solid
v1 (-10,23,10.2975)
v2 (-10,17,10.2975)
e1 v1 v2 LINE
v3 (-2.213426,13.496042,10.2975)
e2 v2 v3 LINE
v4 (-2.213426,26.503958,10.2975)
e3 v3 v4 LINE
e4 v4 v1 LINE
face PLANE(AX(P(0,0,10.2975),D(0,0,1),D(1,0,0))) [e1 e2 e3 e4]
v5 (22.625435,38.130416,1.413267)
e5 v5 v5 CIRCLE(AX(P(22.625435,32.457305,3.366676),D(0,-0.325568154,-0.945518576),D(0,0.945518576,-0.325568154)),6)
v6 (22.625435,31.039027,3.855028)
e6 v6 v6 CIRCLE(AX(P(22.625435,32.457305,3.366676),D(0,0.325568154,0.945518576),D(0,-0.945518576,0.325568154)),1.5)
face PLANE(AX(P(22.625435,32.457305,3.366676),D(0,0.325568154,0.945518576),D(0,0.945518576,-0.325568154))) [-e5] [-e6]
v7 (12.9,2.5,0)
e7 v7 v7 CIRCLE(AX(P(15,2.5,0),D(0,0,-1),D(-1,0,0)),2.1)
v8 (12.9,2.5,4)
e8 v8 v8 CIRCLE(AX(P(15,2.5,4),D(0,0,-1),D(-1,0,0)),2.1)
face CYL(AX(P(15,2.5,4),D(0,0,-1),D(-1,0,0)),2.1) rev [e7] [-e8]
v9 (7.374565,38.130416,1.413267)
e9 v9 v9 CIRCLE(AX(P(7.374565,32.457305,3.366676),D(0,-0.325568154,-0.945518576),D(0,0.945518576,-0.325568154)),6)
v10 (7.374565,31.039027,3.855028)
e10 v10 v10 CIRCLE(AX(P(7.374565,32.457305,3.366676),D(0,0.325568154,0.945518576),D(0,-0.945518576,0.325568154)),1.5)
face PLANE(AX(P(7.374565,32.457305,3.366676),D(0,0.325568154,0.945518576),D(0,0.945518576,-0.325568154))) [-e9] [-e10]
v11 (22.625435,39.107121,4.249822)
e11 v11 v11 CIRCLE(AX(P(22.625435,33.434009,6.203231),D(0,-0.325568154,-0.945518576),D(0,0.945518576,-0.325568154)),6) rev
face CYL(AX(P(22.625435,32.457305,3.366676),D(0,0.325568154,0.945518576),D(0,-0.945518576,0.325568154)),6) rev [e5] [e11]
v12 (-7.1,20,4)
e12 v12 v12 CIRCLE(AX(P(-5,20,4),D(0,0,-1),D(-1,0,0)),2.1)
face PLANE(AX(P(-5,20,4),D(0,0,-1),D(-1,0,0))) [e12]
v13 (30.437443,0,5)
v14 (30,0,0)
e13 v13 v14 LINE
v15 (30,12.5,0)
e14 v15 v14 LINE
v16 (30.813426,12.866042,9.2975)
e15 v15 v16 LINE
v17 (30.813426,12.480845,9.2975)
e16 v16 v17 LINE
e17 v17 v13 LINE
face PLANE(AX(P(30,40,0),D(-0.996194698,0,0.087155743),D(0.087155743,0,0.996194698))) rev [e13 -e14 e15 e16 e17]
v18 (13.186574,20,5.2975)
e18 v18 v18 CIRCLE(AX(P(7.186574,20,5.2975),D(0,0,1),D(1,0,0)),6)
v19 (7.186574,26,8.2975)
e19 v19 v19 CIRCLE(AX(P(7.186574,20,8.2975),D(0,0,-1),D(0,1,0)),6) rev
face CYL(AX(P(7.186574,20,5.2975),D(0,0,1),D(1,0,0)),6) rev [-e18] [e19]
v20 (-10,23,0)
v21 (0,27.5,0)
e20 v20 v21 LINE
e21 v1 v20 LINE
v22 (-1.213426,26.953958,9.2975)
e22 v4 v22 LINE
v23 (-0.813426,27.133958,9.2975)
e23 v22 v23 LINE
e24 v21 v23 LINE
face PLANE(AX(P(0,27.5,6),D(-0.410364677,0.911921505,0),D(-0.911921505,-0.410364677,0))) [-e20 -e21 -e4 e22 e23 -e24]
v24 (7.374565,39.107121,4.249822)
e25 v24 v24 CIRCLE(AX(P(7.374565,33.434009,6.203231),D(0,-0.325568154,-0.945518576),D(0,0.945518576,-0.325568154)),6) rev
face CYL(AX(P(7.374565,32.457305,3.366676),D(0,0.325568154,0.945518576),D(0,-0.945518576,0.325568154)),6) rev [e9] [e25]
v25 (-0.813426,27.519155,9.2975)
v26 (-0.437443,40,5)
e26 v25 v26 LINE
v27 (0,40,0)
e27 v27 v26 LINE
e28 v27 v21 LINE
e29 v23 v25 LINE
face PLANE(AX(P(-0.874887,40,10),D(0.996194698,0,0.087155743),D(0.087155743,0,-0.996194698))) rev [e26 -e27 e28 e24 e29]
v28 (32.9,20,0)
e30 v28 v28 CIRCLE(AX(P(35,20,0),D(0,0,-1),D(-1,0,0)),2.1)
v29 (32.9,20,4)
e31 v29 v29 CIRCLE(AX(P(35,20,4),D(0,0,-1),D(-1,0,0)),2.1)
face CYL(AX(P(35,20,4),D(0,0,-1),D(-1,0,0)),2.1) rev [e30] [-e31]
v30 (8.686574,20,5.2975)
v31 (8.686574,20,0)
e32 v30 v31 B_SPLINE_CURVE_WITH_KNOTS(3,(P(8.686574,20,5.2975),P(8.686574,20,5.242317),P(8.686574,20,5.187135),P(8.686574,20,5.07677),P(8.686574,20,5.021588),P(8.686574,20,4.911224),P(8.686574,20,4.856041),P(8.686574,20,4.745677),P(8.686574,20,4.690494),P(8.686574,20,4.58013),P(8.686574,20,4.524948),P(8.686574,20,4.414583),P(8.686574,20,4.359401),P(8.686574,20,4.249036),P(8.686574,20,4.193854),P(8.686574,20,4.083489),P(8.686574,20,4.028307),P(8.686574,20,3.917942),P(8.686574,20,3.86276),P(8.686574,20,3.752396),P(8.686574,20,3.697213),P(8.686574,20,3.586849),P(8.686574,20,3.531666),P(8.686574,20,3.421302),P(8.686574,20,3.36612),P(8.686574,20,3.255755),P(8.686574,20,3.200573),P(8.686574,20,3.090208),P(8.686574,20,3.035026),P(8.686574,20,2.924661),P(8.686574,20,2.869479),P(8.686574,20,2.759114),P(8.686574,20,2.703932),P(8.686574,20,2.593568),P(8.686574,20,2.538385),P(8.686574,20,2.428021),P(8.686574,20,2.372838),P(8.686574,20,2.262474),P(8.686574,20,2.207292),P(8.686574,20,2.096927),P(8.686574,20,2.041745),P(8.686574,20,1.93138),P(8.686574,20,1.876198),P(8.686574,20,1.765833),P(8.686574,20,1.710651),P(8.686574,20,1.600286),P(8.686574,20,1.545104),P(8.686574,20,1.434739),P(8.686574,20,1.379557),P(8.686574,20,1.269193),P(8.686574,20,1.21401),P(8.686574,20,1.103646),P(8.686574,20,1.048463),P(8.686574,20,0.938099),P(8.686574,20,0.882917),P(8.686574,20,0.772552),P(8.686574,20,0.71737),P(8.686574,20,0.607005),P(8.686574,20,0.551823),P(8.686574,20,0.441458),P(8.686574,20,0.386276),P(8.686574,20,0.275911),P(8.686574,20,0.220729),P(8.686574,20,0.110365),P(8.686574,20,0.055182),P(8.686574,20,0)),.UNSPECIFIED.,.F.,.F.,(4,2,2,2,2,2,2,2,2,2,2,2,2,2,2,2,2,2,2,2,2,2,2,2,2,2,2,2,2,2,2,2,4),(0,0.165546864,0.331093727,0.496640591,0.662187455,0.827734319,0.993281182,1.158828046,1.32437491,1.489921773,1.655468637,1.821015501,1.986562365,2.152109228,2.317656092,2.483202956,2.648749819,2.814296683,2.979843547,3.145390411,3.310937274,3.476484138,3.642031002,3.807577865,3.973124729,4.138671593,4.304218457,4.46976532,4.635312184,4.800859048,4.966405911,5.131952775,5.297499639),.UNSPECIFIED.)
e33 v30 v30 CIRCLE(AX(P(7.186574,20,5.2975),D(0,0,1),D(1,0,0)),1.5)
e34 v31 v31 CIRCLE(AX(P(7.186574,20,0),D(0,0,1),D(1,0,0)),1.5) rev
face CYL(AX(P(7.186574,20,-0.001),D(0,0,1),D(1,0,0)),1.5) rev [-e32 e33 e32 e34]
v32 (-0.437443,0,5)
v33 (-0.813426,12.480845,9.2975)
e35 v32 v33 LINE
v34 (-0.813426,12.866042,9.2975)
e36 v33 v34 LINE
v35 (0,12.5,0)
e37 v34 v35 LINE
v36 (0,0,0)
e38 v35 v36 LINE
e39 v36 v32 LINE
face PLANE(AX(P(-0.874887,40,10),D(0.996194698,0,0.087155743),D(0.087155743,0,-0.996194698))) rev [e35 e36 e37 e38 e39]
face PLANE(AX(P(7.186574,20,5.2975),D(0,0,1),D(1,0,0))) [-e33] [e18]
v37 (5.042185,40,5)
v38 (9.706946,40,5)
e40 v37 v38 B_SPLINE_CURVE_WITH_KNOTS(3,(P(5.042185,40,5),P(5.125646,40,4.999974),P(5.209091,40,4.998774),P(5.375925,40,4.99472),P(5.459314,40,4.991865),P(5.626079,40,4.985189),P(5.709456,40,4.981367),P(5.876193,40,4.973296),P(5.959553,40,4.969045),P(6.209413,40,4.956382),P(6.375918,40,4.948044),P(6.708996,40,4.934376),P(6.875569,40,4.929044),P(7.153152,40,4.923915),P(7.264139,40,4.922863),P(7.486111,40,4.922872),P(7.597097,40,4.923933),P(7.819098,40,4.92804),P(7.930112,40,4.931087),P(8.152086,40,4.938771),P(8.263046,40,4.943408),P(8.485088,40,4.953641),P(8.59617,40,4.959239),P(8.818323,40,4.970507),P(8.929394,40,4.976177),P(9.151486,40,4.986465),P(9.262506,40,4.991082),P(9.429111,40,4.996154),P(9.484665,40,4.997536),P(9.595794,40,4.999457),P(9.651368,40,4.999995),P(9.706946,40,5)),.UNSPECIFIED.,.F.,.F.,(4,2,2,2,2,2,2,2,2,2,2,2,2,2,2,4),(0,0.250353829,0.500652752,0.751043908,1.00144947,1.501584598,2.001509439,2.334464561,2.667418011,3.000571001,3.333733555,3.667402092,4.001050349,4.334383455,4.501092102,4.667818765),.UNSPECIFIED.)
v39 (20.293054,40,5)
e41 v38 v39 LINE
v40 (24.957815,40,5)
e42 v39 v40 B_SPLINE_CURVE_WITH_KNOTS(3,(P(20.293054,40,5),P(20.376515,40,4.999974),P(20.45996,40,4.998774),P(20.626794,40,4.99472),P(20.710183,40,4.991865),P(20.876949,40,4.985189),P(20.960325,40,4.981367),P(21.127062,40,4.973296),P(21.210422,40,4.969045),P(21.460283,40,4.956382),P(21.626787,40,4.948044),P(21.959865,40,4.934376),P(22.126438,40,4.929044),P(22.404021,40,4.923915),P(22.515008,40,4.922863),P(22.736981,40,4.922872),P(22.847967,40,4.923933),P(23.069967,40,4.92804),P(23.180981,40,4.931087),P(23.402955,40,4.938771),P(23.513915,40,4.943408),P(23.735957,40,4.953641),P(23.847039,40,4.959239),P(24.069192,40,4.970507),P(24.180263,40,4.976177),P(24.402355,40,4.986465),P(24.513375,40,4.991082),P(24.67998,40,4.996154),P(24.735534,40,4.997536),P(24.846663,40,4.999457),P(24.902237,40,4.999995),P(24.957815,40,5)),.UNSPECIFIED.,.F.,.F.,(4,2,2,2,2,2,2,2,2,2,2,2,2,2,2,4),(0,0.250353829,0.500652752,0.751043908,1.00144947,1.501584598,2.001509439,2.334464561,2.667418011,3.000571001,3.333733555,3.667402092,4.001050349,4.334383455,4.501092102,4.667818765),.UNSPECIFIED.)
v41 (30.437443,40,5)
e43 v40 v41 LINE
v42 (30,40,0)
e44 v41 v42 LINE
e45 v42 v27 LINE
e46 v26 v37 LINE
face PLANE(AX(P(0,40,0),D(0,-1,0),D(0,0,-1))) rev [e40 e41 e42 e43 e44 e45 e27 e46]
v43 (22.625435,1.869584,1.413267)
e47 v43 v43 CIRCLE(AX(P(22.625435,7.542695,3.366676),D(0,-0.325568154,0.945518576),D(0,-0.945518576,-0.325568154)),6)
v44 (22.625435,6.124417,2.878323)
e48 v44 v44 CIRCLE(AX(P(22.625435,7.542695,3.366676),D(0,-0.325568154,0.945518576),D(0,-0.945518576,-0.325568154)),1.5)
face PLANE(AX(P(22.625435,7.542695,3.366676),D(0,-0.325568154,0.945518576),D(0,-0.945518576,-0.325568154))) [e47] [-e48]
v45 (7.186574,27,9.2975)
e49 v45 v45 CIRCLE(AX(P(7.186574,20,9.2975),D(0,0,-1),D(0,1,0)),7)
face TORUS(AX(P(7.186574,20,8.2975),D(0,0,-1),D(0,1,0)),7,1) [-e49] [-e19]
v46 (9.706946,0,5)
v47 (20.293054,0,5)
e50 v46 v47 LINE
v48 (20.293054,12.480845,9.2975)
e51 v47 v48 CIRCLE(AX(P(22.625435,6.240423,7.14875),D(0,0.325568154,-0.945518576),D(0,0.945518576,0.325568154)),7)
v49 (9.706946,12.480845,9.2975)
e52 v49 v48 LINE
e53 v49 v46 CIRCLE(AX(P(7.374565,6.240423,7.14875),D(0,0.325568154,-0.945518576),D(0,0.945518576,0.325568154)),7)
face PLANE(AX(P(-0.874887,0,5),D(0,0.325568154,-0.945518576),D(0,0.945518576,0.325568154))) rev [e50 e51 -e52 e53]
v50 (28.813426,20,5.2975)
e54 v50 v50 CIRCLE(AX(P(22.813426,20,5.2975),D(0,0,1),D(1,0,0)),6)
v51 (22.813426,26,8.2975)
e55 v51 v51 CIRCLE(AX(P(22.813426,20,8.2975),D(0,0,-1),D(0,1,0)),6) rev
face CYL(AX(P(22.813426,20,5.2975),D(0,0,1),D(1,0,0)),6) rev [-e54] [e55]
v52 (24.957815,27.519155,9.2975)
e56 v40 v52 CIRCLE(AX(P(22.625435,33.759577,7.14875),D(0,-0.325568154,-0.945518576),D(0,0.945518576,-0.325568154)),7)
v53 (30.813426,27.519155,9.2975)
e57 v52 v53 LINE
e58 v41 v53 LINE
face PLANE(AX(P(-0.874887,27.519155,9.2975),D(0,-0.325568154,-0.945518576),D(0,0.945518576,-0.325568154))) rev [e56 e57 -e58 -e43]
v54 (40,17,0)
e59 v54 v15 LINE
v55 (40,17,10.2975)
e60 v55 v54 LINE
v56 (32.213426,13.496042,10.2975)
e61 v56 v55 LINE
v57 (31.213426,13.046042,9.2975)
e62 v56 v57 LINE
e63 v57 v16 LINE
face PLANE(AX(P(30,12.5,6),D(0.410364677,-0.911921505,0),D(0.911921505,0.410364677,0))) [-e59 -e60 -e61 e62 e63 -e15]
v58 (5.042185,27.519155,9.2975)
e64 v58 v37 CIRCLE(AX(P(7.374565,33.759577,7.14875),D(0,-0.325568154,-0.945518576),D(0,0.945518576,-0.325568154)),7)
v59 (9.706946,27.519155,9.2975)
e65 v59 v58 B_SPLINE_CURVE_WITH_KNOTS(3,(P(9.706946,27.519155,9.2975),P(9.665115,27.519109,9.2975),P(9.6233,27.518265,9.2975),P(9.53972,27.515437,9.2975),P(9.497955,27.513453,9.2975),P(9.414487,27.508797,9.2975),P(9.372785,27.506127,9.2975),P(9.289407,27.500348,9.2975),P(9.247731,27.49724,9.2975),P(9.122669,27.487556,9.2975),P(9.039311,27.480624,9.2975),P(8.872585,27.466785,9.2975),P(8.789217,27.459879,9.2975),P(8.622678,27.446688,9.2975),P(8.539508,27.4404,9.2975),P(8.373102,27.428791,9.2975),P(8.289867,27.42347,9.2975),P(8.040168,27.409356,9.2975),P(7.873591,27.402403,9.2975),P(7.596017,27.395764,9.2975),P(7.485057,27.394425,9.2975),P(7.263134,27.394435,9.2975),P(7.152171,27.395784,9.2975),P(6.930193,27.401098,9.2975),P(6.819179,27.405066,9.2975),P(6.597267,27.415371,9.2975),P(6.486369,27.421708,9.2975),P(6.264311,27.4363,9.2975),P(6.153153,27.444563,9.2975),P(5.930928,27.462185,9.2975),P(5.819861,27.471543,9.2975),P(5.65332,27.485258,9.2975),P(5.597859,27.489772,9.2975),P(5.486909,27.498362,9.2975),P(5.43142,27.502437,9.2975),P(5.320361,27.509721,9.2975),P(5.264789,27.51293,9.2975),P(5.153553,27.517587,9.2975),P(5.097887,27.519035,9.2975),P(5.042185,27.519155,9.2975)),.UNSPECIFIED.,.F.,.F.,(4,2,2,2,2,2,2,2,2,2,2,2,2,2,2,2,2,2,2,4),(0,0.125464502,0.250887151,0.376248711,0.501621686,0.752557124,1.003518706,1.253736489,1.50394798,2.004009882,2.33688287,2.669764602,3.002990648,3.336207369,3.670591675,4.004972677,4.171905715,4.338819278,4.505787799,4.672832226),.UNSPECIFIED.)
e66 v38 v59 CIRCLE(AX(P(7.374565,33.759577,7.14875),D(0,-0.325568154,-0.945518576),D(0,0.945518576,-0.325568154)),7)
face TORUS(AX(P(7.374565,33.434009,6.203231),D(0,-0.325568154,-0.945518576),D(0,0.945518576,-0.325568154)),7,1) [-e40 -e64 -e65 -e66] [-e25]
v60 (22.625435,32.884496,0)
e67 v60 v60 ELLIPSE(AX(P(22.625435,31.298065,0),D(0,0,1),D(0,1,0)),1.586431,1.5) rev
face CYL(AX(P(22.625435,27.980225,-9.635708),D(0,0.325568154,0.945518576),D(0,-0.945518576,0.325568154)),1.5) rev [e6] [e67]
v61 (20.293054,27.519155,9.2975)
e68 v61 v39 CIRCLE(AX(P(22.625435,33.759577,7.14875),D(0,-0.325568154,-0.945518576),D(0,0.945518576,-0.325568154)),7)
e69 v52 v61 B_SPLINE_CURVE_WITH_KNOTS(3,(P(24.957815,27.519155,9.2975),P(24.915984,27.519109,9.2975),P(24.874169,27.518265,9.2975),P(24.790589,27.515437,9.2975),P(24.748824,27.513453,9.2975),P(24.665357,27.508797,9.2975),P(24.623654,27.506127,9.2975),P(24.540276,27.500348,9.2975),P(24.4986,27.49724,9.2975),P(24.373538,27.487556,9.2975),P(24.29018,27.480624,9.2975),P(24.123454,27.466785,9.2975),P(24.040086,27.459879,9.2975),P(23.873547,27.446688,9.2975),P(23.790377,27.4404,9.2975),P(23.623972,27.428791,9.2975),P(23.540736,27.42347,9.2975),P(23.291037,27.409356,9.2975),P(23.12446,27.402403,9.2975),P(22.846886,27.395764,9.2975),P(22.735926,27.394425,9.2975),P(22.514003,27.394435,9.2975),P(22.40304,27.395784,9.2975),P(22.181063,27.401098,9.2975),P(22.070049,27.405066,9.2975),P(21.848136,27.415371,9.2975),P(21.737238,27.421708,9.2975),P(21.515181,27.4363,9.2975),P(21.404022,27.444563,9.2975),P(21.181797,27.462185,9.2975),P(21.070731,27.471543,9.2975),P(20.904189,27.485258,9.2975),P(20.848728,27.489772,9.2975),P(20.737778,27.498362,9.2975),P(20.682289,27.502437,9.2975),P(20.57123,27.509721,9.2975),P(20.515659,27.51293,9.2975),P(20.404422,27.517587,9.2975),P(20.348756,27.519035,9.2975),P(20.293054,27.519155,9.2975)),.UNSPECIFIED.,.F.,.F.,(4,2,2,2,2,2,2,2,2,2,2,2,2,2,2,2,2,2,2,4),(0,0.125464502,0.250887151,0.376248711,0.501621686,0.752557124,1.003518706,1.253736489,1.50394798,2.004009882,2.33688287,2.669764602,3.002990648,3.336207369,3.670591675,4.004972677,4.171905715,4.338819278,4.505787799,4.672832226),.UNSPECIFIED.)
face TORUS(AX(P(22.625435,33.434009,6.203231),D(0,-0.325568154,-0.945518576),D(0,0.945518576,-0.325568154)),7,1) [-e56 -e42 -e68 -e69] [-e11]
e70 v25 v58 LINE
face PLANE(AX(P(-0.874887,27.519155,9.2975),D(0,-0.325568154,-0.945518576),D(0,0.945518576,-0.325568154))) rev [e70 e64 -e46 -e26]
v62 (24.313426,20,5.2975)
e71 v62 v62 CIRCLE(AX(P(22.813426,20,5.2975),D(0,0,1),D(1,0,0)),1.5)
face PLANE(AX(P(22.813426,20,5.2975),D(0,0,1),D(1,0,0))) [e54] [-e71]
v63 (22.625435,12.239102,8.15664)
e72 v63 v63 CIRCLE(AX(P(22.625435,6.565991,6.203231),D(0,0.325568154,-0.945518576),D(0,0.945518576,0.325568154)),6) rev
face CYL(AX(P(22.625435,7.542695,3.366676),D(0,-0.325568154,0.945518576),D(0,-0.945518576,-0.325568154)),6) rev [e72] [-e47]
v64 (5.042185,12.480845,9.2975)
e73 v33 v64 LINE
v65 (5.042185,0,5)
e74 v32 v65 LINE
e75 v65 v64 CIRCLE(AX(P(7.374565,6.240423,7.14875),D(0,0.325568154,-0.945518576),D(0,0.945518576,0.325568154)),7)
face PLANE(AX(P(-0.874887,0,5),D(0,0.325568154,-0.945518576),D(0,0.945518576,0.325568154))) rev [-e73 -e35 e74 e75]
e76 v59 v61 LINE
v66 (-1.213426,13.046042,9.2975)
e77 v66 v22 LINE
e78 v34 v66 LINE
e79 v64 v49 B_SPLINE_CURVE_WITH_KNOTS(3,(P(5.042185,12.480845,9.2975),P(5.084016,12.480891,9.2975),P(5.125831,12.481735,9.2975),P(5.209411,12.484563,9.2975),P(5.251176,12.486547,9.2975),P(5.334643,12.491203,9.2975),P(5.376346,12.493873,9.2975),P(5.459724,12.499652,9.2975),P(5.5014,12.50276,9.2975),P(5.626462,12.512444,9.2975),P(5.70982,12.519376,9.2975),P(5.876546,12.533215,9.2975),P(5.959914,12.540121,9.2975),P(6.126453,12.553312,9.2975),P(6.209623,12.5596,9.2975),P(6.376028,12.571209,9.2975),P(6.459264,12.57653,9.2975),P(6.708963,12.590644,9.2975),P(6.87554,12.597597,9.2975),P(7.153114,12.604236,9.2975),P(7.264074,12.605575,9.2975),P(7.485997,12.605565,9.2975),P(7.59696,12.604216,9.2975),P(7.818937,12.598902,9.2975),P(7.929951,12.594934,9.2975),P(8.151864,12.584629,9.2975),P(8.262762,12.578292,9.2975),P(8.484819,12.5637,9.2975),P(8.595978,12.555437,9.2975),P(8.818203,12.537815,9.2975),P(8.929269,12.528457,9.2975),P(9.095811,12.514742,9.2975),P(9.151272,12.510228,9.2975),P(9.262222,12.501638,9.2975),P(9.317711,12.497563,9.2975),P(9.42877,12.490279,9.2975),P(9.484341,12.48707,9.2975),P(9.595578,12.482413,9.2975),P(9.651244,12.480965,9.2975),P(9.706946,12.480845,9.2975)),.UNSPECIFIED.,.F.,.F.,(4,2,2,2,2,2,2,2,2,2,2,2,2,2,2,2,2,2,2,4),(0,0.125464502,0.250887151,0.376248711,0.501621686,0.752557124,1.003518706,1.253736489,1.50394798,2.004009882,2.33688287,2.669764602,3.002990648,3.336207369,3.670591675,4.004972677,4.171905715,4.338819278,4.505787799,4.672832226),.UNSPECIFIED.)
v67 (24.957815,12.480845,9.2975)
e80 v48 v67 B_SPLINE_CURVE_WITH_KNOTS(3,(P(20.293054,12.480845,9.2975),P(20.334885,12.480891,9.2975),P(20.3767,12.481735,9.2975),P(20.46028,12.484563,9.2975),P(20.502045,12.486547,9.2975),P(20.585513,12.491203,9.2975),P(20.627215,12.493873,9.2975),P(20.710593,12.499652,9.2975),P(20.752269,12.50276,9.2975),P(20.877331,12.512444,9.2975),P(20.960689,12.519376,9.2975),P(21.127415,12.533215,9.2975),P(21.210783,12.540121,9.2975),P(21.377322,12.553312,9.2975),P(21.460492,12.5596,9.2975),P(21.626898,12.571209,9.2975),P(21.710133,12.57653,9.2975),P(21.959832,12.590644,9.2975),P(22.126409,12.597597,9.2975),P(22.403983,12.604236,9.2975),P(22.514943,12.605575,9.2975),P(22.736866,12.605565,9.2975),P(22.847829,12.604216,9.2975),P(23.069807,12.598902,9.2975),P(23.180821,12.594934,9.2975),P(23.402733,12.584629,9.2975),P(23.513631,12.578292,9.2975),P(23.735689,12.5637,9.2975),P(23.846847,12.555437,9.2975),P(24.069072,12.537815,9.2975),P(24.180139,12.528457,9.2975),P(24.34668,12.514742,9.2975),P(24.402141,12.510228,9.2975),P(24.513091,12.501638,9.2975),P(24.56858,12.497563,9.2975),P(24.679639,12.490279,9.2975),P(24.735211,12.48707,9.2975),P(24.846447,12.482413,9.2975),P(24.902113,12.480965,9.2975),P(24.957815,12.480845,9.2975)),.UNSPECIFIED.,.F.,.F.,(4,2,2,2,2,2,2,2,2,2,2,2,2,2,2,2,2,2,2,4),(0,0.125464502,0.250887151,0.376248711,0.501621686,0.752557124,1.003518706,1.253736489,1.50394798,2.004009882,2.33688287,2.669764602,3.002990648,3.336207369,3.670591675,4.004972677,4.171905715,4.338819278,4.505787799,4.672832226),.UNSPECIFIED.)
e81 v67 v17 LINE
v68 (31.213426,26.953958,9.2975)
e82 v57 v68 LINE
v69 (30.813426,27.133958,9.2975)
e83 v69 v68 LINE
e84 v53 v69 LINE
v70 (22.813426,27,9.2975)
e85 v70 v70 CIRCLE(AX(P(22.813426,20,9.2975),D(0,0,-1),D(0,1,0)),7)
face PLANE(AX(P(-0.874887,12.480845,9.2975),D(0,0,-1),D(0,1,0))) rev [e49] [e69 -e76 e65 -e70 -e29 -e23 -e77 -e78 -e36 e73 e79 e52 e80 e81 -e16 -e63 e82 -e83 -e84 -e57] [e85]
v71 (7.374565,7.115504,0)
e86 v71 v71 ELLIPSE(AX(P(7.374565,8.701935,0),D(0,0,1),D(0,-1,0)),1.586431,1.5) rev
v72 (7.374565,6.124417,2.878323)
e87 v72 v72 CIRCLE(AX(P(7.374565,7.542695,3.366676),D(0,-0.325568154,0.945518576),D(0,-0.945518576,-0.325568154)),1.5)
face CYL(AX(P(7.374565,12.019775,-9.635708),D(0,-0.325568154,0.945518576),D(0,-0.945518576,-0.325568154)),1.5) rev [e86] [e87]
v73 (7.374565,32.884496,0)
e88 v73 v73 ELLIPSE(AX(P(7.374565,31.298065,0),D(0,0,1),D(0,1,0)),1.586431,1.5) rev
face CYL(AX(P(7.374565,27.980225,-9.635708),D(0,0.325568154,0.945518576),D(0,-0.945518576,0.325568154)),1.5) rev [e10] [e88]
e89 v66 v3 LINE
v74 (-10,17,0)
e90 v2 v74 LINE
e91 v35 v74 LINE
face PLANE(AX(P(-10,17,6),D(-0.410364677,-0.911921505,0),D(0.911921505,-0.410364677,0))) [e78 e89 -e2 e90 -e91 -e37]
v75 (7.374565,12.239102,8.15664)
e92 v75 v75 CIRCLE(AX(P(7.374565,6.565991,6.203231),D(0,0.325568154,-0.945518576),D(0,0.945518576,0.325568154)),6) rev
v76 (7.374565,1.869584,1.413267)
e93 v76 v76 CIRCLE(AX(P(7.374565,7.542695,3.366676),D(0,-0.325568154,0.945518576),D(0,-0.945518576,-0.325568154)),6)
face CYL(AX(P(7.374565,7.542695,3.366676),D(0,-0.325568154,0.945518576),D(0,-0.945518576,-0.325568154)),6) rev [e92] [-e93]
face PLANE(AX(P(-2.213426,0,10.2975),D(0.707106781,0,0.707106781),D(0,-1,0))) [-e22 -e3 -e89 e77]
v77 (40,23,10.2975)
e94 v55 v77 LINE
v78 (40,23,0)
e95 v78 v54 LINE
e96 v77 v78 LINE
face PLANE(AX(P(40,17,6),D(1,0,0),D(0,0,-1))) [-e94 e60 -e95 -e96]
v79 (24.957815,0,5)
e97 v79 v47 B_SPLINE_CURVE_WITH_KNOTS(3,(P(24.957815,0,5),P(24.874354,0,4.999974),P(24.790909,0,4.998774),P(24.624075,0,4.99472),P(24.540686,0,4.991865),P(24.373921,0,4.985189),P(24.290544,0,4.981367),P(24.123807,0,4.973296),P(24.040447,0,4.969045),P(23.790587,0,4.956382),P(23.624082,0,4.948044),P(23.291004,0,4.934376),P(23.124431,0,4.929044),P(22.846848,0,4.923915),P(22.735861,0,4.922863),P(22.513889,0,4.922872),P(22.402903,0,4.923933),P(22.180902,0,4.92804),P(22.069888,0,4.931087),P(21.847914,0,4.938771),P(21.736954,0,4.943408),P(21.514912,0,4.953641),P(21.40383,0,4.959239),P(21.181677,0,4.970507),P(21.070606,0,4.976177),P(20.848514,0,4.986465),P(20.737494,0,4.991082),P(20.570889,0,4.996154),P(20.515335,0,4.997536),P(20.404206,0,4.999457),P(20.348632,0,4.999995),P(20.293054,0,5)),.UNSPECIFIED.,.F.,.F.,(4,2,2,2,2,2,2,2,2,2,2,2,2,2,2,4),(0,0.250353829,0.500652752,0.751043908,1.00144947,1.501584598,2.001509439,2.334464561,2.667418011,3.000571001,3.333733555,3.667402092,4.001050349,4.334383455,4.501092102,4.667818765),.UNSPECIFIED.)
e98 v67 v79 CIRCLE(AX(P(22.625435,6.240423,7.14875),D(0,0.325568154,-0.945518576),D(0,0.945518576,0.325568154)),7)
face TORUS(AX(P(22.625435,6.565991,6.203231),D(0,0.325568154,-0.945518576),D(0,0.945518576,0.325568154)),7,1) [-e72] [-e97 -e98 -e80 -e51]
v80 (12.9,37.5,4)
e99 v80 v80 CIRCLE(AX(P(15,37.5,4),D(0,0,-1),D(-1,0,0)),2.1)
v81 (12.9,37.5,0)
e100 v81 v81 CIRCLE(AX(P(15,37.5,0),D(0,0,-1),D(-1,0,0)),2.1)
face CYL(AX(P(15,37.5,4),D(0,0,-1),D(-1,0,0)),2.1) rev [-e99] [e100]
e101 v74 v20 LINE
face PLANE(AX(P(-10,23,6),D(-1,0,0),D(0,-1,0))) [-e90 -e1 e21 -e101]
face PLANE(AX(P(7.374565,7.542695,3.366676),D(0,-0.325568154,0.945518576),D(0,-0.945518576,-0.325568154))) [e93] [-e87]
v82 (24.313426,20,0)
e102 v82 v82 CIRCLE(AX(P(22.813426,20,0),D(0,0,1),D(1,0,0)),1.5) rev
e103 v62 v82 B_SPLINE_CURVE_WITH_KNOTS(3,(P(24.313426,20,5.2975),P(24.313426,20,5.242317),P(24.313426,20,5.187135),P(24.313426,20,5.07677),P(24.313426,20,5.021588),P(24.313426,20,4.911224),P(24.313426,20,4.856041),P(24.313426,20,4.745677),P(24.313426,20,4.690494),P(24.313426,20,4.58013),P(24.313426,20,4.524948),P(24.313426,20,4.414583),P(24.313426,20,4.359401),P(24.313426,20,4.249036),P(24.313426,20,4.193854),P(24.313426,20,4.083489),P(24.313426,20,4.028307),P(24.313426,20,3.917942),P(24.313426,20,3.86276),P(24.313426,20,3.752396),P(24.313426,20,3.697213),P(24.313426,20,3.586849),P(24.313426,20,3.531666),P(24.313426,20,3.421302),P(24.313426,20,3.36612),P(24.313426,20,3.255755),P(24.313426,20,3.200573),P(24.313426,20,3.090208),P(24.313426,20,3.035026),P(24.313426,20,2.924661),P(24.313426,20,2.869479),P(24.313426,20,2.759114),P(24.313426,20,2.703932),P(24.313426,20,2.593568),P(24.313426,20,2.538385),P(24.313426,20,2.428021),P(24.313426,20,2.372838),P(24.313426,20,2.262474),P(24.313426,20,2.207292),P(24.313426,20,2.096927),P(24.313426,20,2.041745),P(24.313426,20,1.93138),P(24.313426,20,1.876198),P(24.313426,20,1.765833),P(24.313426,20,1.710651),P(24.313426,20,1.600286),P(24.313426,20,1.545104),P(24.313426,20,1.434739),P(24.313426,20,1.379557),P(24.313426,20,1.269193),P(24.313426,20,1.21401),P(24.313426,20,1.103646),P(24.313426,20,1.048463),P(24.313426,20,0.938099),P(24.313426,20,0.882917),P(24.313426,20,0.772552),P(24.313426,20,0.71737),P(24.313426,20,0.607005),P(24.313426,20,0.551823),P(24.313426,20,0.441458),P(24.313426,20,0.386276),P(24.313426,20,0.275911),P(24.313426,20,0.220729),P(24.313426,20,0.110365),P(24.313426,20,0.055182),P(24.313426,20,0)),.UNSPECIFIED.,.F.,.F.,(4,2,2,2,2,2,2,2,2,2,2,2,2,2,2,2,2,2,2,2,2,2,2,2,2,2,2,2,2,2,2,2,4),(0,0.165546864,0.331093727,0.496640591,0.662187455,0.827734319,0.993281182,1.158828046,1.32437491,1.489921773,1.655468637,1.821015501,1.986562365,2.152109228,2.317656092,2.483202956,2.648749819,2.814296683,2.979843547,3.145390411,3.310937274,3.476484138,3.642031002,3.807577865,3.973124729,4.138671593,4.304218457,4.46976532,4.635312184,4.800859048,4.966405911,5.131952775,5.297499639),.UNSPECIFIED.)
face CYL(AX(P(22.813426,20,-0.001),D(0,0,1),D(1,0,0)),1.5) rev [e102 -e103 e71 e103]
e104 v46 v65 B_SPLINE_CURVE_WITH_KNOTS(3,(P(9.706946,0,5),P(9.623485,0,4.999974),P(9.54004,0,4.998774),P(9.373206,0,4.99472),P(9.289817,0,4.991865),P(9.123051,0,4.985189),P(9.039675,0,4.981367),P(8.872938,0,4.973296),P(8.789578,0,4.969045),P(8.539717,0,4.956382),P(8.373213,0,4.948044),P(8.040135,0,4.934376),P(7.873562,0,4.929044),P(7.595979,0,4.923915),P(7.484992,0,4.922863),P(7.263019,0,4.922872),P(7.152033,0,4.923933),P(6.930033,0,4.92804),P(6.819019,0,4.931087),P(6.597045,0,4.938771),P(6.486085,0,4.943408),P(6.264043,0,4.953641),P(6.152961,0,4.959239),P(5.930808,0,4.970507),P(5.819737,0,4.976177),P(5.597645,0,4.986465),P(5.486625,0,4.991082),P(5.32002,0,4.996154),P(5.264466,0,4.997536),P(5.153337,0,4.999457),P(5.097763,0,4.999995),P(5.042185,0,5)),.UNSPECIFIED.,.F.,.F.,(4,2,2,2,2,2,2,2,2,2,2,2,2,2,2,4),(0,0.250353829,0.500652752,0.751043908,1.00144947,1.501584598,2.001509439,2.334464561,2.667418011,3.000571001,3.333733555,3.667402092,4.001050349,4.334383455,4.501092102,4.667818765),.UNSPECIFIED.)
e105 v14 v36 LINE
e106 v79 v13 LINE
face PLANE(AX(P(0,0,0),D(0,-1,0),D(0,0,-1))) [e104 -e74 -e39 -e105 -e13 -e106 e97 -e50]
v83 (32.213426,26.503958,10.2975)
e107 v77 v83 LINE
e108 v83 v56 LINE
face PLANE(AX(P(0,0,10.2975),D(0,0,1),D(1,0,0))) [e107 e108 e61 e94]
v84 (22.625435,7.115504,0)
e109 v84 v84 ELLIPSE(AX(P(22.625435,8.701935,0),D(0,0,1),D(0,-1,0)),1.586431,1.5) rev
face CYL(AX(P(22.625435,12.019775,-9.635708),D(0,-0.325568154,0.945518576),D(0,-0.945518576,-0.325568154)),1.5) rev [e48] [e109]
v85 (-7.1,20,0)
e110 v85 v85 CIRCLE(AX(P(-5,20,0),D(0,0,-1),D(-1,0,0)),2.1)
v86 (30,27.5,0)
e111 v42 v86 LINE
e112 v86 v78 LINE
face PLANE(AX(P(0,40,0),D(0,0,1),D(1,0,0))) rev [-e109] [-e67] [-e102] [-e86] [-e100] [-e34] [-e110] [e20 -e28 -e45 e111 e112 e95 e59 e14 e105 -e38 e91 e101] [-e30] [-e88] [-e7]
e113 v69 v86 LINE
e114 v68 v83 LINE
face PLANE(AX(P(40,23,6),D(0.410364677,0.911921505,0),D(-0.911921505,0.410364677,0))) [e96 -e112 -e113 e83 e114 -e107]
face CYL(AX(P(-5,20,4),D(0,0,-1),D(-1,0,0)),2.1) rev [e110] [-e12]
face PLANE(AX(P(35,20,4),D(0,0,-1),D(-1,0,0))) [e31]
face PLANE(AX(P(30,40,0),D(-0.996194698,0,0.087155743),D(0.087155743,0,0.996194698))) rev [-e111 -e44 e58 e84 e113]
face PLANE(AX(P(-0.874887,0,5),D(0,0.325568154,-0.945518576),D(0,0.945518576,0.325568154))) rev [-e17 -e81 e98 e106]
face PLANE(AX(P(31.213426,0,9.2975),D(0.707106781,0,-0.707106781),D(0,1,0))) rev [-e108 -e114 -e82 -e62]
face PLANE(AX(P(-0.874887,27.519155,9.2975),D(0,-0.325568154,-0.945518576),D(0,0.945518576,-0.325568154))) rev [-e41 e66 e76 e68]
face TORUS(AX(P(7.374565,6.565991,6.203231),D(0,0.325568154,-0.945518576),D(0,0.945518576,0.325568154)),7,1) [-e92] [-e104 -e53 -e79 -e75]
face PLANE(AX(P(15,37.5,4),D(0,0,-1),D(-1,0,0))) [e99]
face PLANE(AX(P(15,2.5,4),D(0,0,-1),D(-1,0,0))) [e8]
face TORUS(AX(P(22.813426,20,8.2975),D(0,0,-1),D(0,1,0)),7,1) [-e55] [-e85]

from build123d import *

# Parameters (mm, degrees)
BOSS_EXTRUDE1_DEPTH     = 40
CUT_EXTRUDE1_DEPTH      = 52.509791542
CUT_EXTRUDE1_DEPTH_BACK = 52.509791542
SKETCH5_R               = 6
CUT_EXTRUDE2_DEPTH      = 4
SKETCH7_R               = 6
CUT_EXTRUDE3_DEPTH      = 4
FILLET1_R               = 1
BOSS_EXTRUDE2_DEPTH     = 6
SKETCH10_R              = 2.1
CUT_EXTRUDE5_DEPTH      = 4
CUT_EXTRUDE6_REACH      = 58.816
SKETCH11_R              = 1.5
CUT_EXTRUDE7_REACH      = 59.386
SKETCH12_R              = 1.5
CUT_EXTRUDE8_REACH      = 57.054
SKETCH13_R              = 1.5
BOSS_EXTRUDE3_DEPTH     = 3.297499639
BOSS_EXTRUDE4_DEPTH     = 1
CHAMFER1_SIZE           = 1


# Some blends are built 0.0001 mm under size
with BuildPart() as part:
    # Sketch2 → Boss-Extrude1 (new body)
    with BuildSketch(Plane(origin=(0, 0, 0), x_dir=(1, 0, 0), z_dir=(0, 1, 0))):
        Polygon((0, 0), (30, 0), (30.874886635, -10), (-0.874886635, -10), align=None)
    extrude(amount=BOSS_EXTRUDE1_DEPTH)

    # Sketch3 → Cut-Extrude1 (cut, two sides: drawn at the far end of the back side and taken through both)
    with BuildSketch(Plane(origin=(0, 0, 0), x_dir=(0, 0, -1), z_dir=(1, 0, 0)).offset(-CUT_EXTRUDE1_DEPTH_BACK)):
        Polygon((-5, 0), (-9.297499639, 12.480845198), (-9.297499639, 27.519154802), (-5, 40), (-10, 40), (-10, 0), align=None)
    extrude(amount=CUT_EXTRUDE1_DEPTH + CUT_EXTRUDE1_DEPTH_BACK, mode=Mode.SUBTRACT)

    # Sketch5 → Cut-Extrude2 (cut)
    with BuildSketch(Plane(origin=(0, -1.539153688, 4.470026884), x_dir=(1, 0, 0), z_dir=(0, -0.32556815445715714, 0.9455185755993166))):
        with Locations(Location((7.374565432, 8.227840772, 0), (0, 0, 270))):
            Circle(SKETCH5_R)
        with Locations(Location((22.625434568, 8.227840772, 0), (0, 0, 270))):
            Circle(SKETCH5_R)
    cut_extrude2 = extrude(amount=-CUT_EXTRUDE2_DEPTH, mode=Mode.SUBTRACT)

    # Mirror3: Cut-Extrude2 across plane
    add(cut_extrude2.mirror(Plane.ZX.offset(20)), mode=Mode.SUBTRACT)

    # Sketch7 → Cut-Extrude3 (cut)
    with BuildSketch(Plane.XY.offset(9.297499639)):
        with Locations((7.186574182, 20)):
            Circle(SKETCH7_R)
        with Locations((22.813425818, 20)):
            Circle(SKETCH7_R)
    extrude(amount=-CUT_EXTRUDE3_DEPTH, mode=Mode.SUBTRACT)

    # Fillet1
    # the kernel refuses this fillet: 1 mm, written as the material it takes off along each edge
    with BuildSketch(Plane(origin=(7.374565432, 6.240422599, 7.148749819), x_dir=(0, -0.9455185755993166, -0.3255681544571572), z_dir=(-1, 0, 0))) as fillet1_piece_1:
        with BuildLine():
            CenterArc((6 + FILLET1_R, -FILLET1_R), FILLET1_R, 90, 90)
            Line((6, -FILLET1_R), (6, 0))
            Line((6, 0), (6 + FILLET1_R, 0))
        make_face()
    revolve(axis=Axis((7.374565432, 6.240422599, 7.148749819), (0, -0.32556815445715714, 0.9455185755993166)), mode=Mode.SUBTRACT)
    with BuildSketch(Plane(origin=(22.625434568, 6.240422599, 7.148749819), x_dir=(0, -0.9455185755993167, -0.3255681544571572), z_dir=(-1, 0, 0))) as fillet1_piece_2:
        with BuildLine():
            CenterArc((6 + FILLET1_R, -FILLET1_R), FILLET1_R, 90, 90)
            Line((6, -FILLET1_R), (6, 0))
            Line((6, 0), (6 + FILLET1_R, 0))
        make_face()
    revolve(axis=Axis((22.625434568, 6.240422599, 7.148749819), (0, -0.32556815445715714, 0.9455185755993166)), mode=Mode.SUBTRACT)
    with BuildSketch(Plane(origin=(7.374565432, 33.759577401, 7.148749819), x_dir=(0, 0.9455185755993166, -0.32556815445715714), z_dir=(-1, 0, 0))) as fillet1_piece_3:
        with BuildLine():
            CenterArc((6 + FILLET1_R, FILLET1_R), FILLET1_R, 180, 90)
            Line((6, FILLET1_R), (6, 0))
            Line((6, 0), (6 + FILLET1_R, 0))
        make_face()
    revolve(axis=Axis((7.374565432, 33.759577401, 7.148749819), (0, -0.3255681544571571, -0.9455185755993166)), mode=Mode.SUBTRACT)
    with BuildSketch(Plane(origin=(22.625434568, 33.759577401, 7.148749819), x_dir=(0, 0.9455185755993165, -0.3255681544571574), z_dir=(-1, 0, 0))) as fillet1_piece_4:
        with BuildLine():
            CenterArc((6 + FILLET1_R, FILLET1_R), FILLET1_R, 180, 90)
            Line((6, FILLET1_R), (6, 0))
            Line((6, 0), (6 + FILLET1_R, 0))
        make_face()
    revolve(axis=Axis((22.625434568, 33.759577401, 7.148749819), (0, -0.3255681544571571, -0.9455185755993166)), mode=Mode.SUBTRACT)
    with BuildSketch(Plane(origin=(7.186574182, 20, 9.297499639), x_dir=(1, 0, 0), z_dir=(0, -1, 0))) as fillet1_piece_5:
        with BuildLine():
            CenterArc((6 + FILLET1_R, -FILLET1_R), FILLET1_R, 90, 90)
            Line((6, -FILLET1_R), (6, 0))
            Line((6, 0), (6 + FILLET1_R, 0))
        make_face()
    revolve(axis=Axis((7.186574182, 20, 9.297499639), (0, 0, 1)), mode=Mode.SUBTRACT)
    with BuildSketch(Plane(origin=(22.813425818, 20, 9.297499639), x_dir=(1, 0, 0), z_dir=(0, -1, 0))) as fillet1_piece_6:
        with BuildLine():
            CenterArc((6 + FILLET1_R, -FILLET1_R), FILLET1_R, 90, 90)
            Line((6, -FILLET1_R), (6, 0))
            Line((6, 0), (6 + FILLET1_R, 0))
        make_face()
    revolve(axis=Axis((22.813425818, 20, 9.297499639), (0, 0, 1)), mode=Mode.SUBTRACT)

    # Sketch9 → Boss-Extrude2 (add)
    with BuildSketch(Plane(origin=(0, 0, 0), x_dir=(-1, 0, 0), z_dir=(0, 0, -1))):
        Polygon((-30, 12.5), (-40, 17), (-40, 23), (-30, 27.5), align=None)
        Polygon((0, 12.5), (0, 27.5), (10, 23), (10, 17), align=None)
    extrude(amount=-BOSS_EXTRUDE2_DEPTH)

    # Sketch10 → Cut-Extrude5 (cut)
    with BuildSketch(Plane(origin=(0, 0, 0), x_dir=(-1, 0, 0), z_dir=(0, 0, -1))):
        with Locations((-15, 37.5)):
            Circle(SKETCH10_R)
        with Locations((-15, 2.5)):
            Circle(SKETCH10_R)
        with Locations((-35, 20)):
            Circle(SKETCH10_R)
        with Locations((5, 20)):
            Circle(SKETCH10_R)
    extrude(amount=-CUT_EXTRUDE5_DEPTH, mode=Mode.SUBTRACT)

    # Sketch11 → Cut-Extrude6 (cut, up to next)
    with BuildSketch(Plane.XY.offset(5.297499639), mode=Mode.PRIVATE) as cut_extrude6_sk1:
        with Locations((7.186574182, 20)):
            Circle(SKETCH11_R)
    cut_extrude6_tool1 = extrude(cut_extrude6_sk1.sketch, amount=-CUT_EXTRUDE6_REACH, mode=Mode.PRIVATE) & part.part
    # Sketch11 → Cut-Extrude6 (cut, up to next)
    with BuildSketch(Plane.XY.offset(5.297499639), mode=Mode.PRIVATE) as cut_extrude6_sk2:
        with Locations((22.813425818, 20)):
            Circle(SKETCH11_R)
    cut_extrude6_tool2 = extrude(cut_extrude6_sk2.sketch, amount=-CUT_EXTRUDE6_REACH, mode=Mode.PRIVATE) & part.part
    add(cut_extrude6_tool1.solids().sort_by_distance((7.186574, 20, 5.2975))[0], mode=Mode.SUBTRACT)
    add(cut_extrude6_tool2.solids().sort_by_distance((22.813426, 20, 5.2975))[0], mode=Mode.SUBTRACT)

    # Cut-Extrude7: up to this plane
    cut_extrude7_end = Plane(origin=(0, 40, 0), z_dir=(0, 0, 1))
    # Sketch12 → Cut-Extrude7 (cut, up to the surface)
    with BuildSketch(Plane(origin=(0, -0.23688107, 0.687952582), x_dir=(1, 0, 0), z_dir=(0, -0.3255681544571572, 0.9455185755993167)), mode=Mode.PRIVATE) as cut_extrude7_sk1:
        with Locations(Location((7.374565432, 8.227840772, 0), (0, 0, 270))):
            Circle(SKETCH12_R)
    cut_extrude7_tool1 = split(extrude(cut_extrude7_sk1.sketch, amount=-CUT_EXTRUDE7_REACH, mode=Mode.PRIVATE), bisect_by=cut_extrude7_end, keep=Keep.BOTH, mode=Mode.PRIVATE)
    add(cut_extrude7_tool1.solids().sort_by_distance((7.374565, 7.542695, 3.366676))[0], mode=Mode.SUBTRACT)
    # Sketch12 → Cut-Extrude7 (cut, up to the surface)
    with BuildSketch(Plane(origin=(0, -0.23688107, 0.687952582), x_dir=(1, 0, 0), z_dir=(0, -0.3255681544571572, 0.9455185755993167)), mode=Mode.PRIVATE) as cut_extrude7_sk2:
        with Locations(Location((22.625434568, 8.227840772, 0), (0, 0, 270))):
            Circle(SKETCH12_R)
    cut_extrude7_tool2 = split(extrude(cut_extrude7_sk2.sketch, amount=-CUT_EXTRUDE7_REACH, mode=Mode.PRIVATE), bisect_by=cut_extrude7_end, keep=Keep.BOTH, mode=Mode.PRIVATE)
    add(cut_extrude7_tool2.solids().sort_by_distance((22.625435, 7.542695, 3.366676))[0], mode=Mode.SUBTRACT)

    # Cut-Extrude8: up to this plane
    cut_extrude8_end = Plane(origin=(0, 40, 0), z_dir=(0, 0, 1))
    # Sketch13 → Cut-Extrude8 (cut, up to the surface)
    with BuildSketch(Plane(origin=(0, 4.476665998, 13.001182088), x_dir=(1, 0, 0), z_dir=(0, 0.3255681544571572, 0.9455185755993167)), mode=Mode.PRIVATE) as cut_extrude8_sk1:
        with Locations(Location((22.625434568, 29.592902252, 0), (0, 0, 270))):
            Circle(SKETCH13_R)
    cut_extrude8_tool1 = split(extrude(cut_extrude8_sk1.sketch, amount=-CUT_EXTRUDE8_REACH, mode=Mode.PRIVATE), bisect_by=cut_extrude8_end, keep=Keep.BOTH, mode=Mode.PRIVATE)
    add(cut_extrude8_tool1.solids().sort_by_distance((22.625435, 32.457305, 3.366676))[0], mode=Mode.SUBTRACT)
    # Sketch13 → Cut-Extrude8 (cut, up to the surface)
    with BuildSketch(Plane(origin=(0, 4.476665998, 13.001182088), x_dir=(1, 0, 0), z_dir=(0, 0.3255681544571572, 0.9455185755993167)), mode=Mode.PRIVATE) as cut_extrude8_sk2:
        with Locations(Location((7.374565432, 29.592902252, 0), (0, 0, 270))):
            Circle(SKETCH13_R)
    cut_extrude8_tool2 = split(extrude(cut_extrude8_sk2.sketch, amount=-CUT_EXTRUDE8_REACH, mode=Mode.PRIVATE), bisect_by=cut_extrude8_end, keep=Keep.BOTH, mode=Mode.PRIVATE)
    add(cut_extrude8_tool2.solids().sort_by_distance((7.374565, 32.457305, 3.366676))[0], mode=Mode.SUBTRACT)

    # Sketch15 → Boss-Extrude3 (add)
    with BuildSketch(Plane.XY.offset(6)):
        Polygon((30.524931981, 27.263780608), (30.524931981, 12.736219392), (40, 17), (40, 23), align=None)
        Polygon((-0.524931981, 12.736219392), (-0.524931981, 27.263780608), (-10, 23), (-10, 17), align=None)
    extrude(amount=BOSS_EXTRUDE3_DEPTH)

    # Sketch17 → Boss-Extrude4 (add)
    with BuildSketch(Plane.XY.offset(9.297499639)):
        Polygon((31.213425818, 26.953958382), (31.213425818, 13.046041618), (40, 17), (40, 23), align=None)
        Polygon((-10, 17), (-1.213425818, 13.046041618), (-1.213425818, 26.953958382), (-10, 23), align=None)
    extrude(amount=BOSS_EXTRUDE4_DEPTH)

    # Chamfer1
    chamfer1_edges = [part.edges().sort_by_distance(p)[0] for p in [
        (31.213425818, 20, 10.297499639),
        (-1.213425818, 20, 10.297499639),
    ]]
    chamfer(chamfer1_edges, length=CHAMFER1_SIZE - 0.0001)  # a hair under: the kernel refuses the full size


solid = part.part
